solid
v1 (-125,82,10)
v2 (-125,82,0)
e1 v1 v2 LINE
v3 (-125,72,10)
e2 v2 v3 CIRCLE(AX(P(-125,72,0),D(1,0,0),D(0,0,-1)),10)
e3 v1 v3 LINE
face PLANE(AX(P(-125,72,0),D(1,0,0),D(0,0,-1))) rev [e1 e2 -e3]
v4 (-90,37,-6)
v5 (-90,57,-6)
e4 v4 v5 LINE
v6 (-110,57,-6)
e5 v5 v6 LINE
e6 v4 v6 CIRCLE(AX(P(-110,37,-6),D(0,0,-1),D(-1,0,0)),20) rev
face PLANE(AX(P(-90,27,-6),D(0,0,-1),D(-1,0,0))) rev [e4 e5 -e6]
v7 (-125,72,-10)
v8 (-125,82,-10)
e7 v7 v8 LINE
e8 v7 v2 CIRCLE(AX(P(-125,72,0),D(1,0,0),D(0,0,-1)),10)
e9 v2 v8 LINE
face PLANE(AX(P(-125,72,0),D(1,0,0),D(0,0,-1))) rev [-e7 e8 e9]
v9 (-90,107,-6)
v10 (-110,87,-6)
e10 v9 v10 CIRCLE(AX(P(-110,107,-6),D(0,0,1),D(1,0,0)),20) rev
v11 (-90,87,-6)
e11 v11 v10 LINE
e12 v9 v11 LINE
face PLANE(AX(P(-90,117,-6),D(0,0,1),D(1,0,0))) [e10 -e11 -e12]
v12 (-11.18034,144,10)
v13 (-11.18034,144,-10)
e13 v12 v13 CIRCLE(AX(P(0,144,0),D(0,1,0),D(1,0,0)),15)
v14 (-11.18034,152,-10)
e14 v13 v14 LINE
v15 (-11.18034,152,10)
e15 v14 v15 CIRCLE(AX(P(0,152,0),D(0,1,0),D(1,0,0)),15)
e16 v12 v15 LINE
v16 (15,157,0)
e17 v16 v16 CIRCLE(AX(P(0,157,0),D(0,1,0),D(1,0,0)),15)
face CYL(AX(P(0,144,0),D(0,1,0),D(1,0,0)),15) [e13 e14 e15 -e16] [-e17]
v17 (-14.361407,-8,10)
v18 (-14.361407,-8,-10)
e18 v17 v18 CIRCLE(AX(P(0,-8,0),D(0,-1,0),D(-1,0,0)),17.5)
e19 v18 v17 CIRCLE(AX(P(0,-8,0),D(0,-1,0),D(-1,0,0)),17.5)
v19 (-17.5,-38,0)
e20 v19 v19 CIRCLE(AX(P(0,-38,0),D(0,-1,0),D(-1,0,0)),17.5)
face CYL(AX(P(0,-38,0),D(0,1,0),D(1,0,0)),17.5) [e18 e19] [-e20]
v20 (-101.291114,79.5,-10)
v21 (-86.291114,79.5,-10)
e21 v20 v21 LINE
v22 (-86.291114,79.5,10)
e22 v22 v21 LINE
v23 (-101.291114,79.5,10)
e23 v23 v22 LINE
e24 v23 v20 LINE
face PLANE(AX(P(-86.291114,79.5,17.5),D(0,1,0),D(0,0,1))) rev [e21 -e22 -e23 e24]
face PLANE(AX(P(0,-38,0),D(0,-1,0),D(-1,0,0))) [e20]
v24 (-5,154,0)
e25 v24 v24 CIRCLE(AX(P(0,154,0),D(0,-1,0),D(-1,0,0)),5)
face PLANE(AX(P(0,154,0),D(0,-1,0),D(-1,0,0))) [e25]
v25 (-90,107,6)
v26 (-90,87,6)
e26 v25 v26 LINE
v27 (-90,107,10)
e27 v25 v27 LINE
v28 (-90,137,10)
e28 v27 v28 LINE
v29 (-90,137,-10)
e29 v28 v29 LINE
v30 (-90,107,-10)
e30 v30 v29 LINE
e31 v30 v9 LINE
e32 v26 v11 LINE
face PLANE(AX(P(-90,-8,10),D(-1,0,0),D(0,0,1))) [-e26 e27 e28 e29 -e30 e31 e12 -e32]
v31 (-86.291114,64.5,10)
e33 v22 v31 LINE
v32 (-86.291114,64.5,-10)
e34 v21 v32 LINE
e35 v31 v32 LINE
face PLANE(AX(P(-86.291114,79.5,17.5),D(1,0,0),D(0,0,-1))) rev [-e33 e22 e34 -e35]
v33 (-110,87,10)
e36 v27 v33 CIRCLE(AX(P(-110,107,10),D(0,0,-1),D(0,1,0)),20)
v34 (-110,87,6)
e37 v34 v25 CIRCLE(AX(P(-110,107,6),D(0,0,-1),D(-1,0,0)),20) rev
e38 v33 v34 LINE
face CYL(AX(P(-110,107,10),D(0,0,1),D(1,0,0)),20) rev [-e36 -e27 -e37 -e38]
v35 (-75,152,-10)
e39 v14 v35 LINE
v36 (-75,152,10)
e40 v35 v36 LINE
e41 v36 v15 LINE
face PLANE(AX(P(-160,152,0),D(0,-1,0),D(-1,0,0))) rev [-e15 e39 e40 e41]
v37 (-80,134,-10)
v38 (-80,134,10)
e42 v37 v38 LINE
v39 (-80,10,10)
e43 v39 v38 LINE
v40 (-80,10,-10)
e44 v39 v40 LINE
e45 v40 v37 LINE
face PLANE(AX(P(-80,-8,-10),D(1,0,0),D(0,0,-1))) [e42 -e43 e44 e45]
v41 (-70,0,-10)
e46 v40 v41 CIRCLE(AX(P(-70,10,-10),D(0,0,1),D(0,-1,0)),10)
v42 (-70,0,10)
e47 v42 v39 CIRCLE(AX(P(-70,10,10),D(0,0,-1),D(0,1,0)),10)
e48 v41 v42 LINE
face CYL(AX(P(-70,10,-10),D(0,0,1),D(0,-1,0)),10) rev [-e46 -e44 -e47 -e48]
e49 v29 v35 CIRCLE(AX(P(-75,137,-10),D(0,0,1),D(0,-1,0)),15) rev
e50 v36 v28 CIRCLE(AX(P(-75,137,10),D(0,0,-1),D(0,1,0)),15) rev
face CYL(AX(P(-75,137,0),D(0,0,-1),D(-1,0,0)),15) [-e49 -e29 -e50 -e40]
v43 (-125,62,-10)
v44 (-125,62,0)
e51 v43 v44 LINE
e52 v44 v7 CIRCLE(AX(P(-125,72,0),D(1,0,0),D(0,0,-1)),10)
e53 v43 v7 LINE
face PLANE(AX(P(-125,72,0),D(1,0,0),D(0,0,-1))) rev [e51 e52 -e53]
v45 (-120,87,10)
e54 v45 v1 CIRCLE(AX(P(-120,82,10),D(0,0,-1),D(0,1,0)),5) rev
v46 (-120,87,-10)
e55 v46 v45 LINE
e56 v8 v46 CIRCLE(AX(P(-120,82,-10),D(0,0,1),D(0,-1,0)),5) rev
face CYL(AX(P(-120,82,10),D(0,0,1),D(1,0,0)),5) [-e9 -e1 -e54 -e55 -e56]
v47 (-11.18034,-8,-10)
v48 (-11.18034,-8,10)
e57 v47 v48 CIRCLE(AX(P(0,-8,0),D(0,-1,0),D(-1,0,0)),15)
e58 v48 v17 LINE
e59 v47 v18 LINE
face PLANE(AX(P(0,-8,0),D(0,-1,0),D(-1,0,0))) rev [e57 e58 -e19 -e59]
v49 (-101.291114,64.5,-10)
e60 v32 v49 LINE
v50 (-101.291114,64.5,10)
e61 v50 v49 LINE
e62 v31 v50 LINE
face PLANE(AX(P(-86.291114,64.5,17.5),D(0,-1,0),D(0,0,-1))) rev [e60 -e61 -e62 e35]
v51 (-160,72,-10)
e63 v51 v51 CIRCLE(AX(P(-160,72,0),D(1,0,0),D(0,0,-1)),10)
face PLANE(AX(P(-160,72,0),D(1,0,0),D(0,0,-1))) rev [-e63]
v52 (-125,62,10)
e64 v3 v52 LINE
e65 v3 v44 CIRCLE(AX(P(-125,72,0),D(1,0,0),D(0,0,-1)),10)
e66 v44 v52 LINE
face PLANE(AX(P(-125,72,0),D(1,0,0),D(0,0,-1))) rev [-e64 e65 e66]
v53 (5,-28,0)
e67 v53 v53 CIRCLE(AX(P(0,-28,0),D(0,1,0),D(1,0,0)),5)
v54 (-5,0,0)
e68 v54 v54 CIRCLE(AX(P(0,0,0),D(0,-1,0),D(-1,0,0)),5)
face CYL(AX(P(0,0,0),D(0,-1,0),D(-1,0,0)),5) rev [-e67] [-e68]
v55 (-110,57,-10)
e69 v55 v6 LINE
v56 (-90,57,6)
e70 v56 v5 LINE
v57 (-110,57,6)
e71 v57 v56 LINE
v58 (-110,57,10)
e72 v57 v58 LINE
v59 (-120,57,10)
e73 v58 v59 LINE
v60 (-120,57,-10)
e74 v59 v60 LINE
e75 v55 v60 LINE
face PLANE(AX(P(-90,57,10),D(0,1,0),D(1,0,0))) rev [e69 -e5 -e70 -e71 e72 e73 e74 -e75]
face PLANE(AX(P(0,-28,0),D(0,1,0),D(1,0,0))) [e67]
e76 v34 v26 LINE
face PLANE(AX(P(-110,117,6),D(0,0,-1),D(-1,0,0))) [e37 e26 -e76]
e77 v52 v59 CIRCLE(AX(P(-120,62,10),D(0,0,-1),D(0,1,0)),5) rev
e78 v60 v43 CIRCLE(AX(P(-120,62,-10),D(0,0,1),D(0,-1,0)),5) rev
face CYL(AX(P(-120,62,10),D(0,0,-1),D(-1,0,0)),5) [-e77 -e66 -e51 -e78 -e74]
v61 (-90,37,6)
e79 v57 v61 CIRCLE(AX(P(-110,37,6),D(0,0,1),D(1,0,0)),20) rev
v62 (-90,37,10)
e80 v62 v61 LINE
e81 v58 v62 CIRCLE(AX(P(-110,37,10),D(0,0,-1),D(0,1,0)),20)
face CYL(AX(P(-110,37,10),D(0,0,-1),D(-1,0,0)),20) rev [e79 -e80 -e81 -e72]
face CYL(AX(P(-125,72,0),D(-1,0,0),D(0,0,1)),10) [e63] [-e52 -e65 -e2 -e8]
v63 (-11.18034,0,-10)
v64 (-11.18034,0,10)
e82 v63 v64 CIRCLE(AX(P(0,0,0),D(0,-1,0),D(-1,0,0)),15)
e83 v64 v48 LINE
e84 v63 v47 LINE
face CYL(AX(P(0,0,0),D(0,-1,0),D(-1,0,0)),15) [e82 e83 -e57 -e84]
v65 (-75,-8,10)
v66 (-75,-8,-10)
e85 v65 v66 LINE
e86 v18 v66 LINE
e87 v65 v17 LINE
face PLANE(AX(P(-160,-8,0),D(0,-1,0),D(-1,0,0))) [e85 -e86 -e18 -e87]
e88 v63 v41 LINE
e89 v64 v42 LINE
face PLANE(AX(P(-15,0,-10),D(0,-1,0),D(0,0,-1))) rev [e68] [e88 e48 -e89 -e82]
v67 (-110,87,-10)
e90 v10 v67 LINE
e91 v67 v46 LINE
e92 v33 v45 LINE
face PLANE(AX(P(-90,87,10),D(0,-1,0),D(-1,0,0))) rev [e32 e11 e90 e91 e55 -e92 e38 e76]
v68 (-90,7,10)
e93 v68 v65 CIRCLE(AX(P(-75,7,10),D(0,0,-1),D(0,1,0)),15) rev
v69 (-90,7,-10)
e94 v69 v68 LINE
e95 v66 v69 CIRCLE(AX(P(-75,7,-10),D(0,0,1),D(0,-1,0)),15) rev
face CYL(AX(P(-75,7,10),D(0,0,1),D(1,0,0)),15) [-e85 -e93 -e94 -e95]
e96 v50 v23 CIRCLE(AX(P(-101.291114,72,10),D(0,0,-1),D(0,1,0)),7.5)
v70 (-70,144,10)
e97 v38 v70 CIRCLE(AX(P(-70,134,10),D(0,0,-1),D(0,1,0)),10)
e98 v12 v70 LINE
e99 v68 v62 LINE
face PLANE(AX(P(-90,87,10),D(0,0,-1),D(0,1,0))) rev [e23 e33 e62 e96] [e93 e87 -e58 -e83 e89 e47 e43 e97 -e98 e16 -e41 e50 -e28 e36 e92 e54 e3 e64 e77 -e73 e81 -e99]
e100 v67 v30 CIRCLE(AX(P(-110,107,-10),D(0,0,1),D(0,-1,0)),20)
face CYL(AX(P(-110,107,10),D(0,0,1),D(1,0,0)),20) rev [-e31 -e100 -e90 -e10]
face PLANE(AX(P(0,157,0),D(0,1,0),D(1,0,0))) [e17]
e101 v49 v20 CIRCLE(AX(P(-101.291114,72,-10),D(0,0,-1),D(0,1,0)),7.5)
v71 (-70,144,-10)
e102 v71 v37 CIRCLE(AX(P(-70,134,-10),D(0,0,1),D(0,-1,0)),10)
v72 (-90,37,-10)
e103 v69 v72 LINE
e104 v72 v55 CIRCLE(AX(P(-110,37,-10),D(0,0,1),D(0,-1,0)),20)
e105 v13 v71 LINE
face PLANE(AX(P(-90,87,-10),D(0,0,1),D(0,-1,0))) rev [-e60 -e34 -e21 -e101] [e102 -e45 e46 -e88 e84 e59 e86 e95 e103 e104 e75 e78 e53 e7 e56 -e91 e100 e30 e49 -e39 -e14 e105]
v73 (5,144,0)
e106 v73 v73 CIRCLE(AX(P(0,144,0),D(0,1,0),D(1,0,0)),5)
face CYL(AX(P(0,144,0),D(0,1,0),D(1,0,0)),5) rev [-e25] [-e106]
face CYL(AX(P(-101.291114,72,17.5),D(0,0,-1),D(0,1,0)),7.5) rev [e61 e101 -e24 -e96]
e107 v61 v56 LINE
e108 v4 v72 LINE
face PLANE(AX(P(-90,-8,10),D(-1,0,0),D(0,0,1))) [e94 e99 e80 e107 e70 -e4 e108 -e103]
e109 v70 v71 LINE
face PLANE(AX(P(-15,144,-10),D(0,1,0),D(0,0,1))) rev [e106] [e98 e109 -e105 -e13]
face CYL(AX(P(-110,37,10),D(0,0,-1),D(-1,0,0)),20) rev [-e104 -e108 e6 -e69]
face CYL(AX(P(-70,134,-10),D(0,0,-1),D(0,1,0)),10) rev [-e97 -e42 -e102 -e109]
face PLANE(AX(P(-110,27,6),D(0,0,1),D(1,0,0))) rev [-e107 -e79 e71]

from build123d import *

# Parameters (mm, degrees)
SKETCH1_R                = 10
BOSS_EXTRUDE1_DEPTH      = 35
SKETCH2_W                = 20
SKETCH2_H                = 30
BOSS_EXTRUDE2_DEPTH      = 35
BOSS_EXTRUDE3_DEPTH      = 80
BOSS_EXTRUDE3_DEPTH_BACK = 80
SKETCH3_W                = 20
SKETCH3_H                = 10
SKETCH4_W                = 20
SKETCH4_H                = 8
BOSS_EXTRUDE4_DEPTH      = 65
SKETCH5_R                = 5
BOSS_EXTRUDE6_DEPTH      = 8
BOSS_EXTRUDE7_START      = -8
SKETCH6_R                = 5
BOSS_EXTRUDE7_DEPTH      = 8
FILLET1_R                = 15
FILLET2_R                = 10
FILLET3_R                = 10
FILLET4_R                = 15
FILLET5_R                = 20
FILLET6_R                = 20
SKETCH7_W                = 12
SKETCH7_H                = 20
CUT_EXTRUDE1_DEPTH       = 30
SKETCH8_R                = 17.5
BOSS_EXTRUDE8_DEPTH      = 30
SKETCH9_R                = 5
CUT_EXTRUDE2_DEPTH       = 20
BOSS_EXTRUDE9_START      = 5
SKETCH10_R               = 15
BOSS_EXTRUDE9_DEPTH      = 5
CUT_EXTRUDE4_START       = -2
SKETCH11_R               = 5
CUT_EXTRUDE4_DEPTH       = 2
CUT_EXTRUDE5_DEPTH       = 211.624072698
FILLET9_R                = 5
BODY_MOVE_COPY1_ANGLE    = 90


with BuildPart() as part:
    # Sketch1 → Boss-Extrude1 (new body)
    with BuildSketch(Plane.XY):
        Circle(SKETCH1_R)
    extrude(amount=BOSS_EXTRUDE1_DEPTH)

    # Sketch2 → Boss-Extrude2 (add)
    with BuildSketch(Plane.XY.offset(35)):
        Rectangle(SKETCH2_W, SKETCH2_H)
    extrude(amount=BOSS_EXTRUDE2_DEPTH)

    # Sketch3 → Boss-Extrude3 (add, two sides: drawn at the far end of the back side and taken through both)
    with BuildSketch(Plane(origin=(0, 0, 0), x_dir=(1, 0, 0), z_dir=(0, 1, 0)).offset(-BOSS_EXTRUDE3_DEPTH_BACK)):
        with Locations((0, -75)):
            Rectangle(SKETCH3_W, SKETCH3_H)
    extrude(amount=BOSS_EXTRUDE3_DEPTH + BOSS_EXTRUDE3_DEPTH_BACK)

    # Sketch4 → Boss-Extrude4 (add)
    with BuildSketch(Plane.XY.offset(80)):
        with Locations((0, 76)):
            Rectangle(SKETCH4_W, SKETCH4_H)
        with Locations((0, -76)):
            Rectangle(SKETCH4_W, SKETCH4_H)
    extrude(amount=BOSS_EXTRUDE4_DEPTH)

    # Sketch5 → Boss-Extrude6 (add)
    with BuildSketch(Plane(origin=(0, 80, 0), x_dir=(1, 0, 0), z_dir=(0, 1, 0))):
        with BuildLine():
            Line((10, -145), (10, -148.819660113))
            ThreePointArc((10, -148.819660113), (0, -175), (-10, -148.819660113))
            Line((-10, -148.819660113), (-10, -145))
            Line((-10, -145), (10, -145))
        make_face()
        with Locations(Location((0, -160, 0), (0, 0, 270))):
            Circle(SKETCH5_R, mode=Mode.SUBTRACT)
    extrude(amount=-BOSS_EXTRUDE6_DEPTH)

    # Sketch6 → Boss-Extrude7 (add)
    with BuildSketch(Plane.XZ.offset(80).offset(BOSS_EXTRUDE7_START)):
        with BuildLine():
            Line((-10, 148.819660113), (-10, 145))
            Line((-10, 145), (10, 145))
            Line((10, 145), (10, 148.819660113))
            ThreePointArc((10, 148.819660113), (0, 175), (-10, 148.819660113))
        make_face()
        with Locations(Location((0, 160, 0), (0, 0, 90))):
            Circle(SKETCH6_R, mode=Mode.SUBTRACT)
    extrude(amount=BOSS_EXTRUDE7_DEPTH)

    # Fillet1
    fillet1_edges = [part.edges().sort_by_distance(p)[0] for p in [
        (0, 80, 70),
    ]]
    fillet(fillet1_edges, radius=FILLET1_R)

    # Fillet2
    fillet2_edges = [part.edges().sort_by_distance(p)[0] for p in [
        (0, 72, 80),
    ]]
    fillet(fillet2_edges, radius=FILLET2_R)

    # Fillet3
    fillet3_edges = [part.edges().sort_by_distance(p)[0] for p in [
        (0, -72, 80),
    ]]
    fillet(fillet3_edges, radius=FILLET3_R)

    # Fillet4
    fillet4_edges = [part.edges().sort_by_distance(p)[0] for p in [
        (0, -80, 70),
    ]]
    fillet(fillet4_edges, radius=FILLET4_R)

    # Fillet5
    fillet5_edges = [part.edges().sort_by_distance(p)[0] for p in [
        (0, 15, 70),
    ]]
    fillet(fillet5_edges, radius=FILLET5_R)

    # Fillet6
    fillet6_edges = [part.edges().sort_by_distance(p)[0] for p in [
        (0, -15, 70),
    ]]
    fillet(fillet6_edges, radius=FILLET6_R)

    # Sketch7 → Cut-Extrude1 (cut)
    with BuildSketch(Plane(origin=(0, 15, 0), x_dir=(1, 0, 0), z_dir=(0, 1, 0))):
        with Locations((0, -60)):
            Rectangle(SKETCH7_W, SKETCH7_H)
    cut_extrude1 = extrude(amount=CUT_EXTRUDE1_DEPTH, mode=Mode.SUBTRACT)

    # Mirror1: Cut-Extrude1 across plane
    add(cut_extrude1.mirror(Plane.ZX), mode=Mode.SUBTRACT)

    # Sketch8 → Boss-Extrude8 (add)
    with BuildSketch(Plane.XZ.offset(80)):
        with Locations(Location((0, 160, 0), (0, 0, 235.150095421))):
            Circle(SKETCH8_R)
    extrude(amount=BOSS_EXTRUDE8_DEPTH)

    # Sketch9 → Cut-Extrude2 (cut)
    with BuildSketch(Plane(origin=(0, -80, 0), x_dir=(1, 0, 0), z_dir=(0, 1, 0))):
        with Locations(Location((0, -160, 0), (0, 0, 270))):
            Circle(SKETCH9_R)
    extrude(amount=-CUT_EXTRUDE2_DEPTH, mode=Mode.SUBTRACT)

    # Sketch10 → Boss-Extrude9 (add)
    with BuildSketch(Plane(origin=(0, 80, 0), x_dir=(1, 0, 0), z_dir=(0, 1, 0)).offset(BOSS_EXTRUDE9_START)):
        with Locations(Location((0, -160, 0), (0, 0, 270))):
            Circle(SKETCH10_R)
    extrude(amount=-BOSS_EXTRUDE9_DEPTH)

    # Sketch11 → Cut-Extrude4 (cut)
    with BuildSketch(Plane.XZ.offset(-80).offset(CUT_EXTRUDE4_START)):
        with Locations(Location((0, 160, 0), (0, 0, 90))):
            Circle(SKETCH11_R)
    extrude(amount=CUT_EXTRUDE4_DEPTH, mode=Mode.SUBTRACT)

    # Sketch12 → Cut-Extrude5 (cut, through all)
    with BuildSketch(Plane(origin=(10, 0, 0), x_dir=(0, 0, -1), z_dir=(1, 0, 0))):
        with BuildLine():
            Line((-73.708886101, 7.5), (-58.708886101, 7.5))
            ThreePointArc((-58.708886101, 7.5), (-51.208886101, 0), (-58.708886101, -7.5))
            Line((-58.708886101, -7.5), (-73.708886101, -7.5))
            Line((-73.708886101, -7.5), (-73.708886101, 7.5))
        make_face()
    extrude(amount=-CUT_EXTRUDE5_DEPTH, mode=Mode.SUBTRACT)

    # Fillet9
    fillet9_edges = [part.edges().sort_by_distance(p)[0] for p in [
        (0, 15, 35),
        (0, -15, 35),
    ]]
    fillet(fillet9_edges, radius=FILLET9_R - 0.0001)  # a hair under: the kernel refuses the full size


with BuildPart() as part_1:
    # Body-Move/Copy1: read off the stored shape, not the designer's step
    # Body-Move/Copy1: moved
    add(part.part.moved(Location((0, 72, -160))).rotate(Axis((0, 0, 0), (0, 1, 0)), BODY_MOVE_COPY1_ANGLE))


solid = part_1.part
